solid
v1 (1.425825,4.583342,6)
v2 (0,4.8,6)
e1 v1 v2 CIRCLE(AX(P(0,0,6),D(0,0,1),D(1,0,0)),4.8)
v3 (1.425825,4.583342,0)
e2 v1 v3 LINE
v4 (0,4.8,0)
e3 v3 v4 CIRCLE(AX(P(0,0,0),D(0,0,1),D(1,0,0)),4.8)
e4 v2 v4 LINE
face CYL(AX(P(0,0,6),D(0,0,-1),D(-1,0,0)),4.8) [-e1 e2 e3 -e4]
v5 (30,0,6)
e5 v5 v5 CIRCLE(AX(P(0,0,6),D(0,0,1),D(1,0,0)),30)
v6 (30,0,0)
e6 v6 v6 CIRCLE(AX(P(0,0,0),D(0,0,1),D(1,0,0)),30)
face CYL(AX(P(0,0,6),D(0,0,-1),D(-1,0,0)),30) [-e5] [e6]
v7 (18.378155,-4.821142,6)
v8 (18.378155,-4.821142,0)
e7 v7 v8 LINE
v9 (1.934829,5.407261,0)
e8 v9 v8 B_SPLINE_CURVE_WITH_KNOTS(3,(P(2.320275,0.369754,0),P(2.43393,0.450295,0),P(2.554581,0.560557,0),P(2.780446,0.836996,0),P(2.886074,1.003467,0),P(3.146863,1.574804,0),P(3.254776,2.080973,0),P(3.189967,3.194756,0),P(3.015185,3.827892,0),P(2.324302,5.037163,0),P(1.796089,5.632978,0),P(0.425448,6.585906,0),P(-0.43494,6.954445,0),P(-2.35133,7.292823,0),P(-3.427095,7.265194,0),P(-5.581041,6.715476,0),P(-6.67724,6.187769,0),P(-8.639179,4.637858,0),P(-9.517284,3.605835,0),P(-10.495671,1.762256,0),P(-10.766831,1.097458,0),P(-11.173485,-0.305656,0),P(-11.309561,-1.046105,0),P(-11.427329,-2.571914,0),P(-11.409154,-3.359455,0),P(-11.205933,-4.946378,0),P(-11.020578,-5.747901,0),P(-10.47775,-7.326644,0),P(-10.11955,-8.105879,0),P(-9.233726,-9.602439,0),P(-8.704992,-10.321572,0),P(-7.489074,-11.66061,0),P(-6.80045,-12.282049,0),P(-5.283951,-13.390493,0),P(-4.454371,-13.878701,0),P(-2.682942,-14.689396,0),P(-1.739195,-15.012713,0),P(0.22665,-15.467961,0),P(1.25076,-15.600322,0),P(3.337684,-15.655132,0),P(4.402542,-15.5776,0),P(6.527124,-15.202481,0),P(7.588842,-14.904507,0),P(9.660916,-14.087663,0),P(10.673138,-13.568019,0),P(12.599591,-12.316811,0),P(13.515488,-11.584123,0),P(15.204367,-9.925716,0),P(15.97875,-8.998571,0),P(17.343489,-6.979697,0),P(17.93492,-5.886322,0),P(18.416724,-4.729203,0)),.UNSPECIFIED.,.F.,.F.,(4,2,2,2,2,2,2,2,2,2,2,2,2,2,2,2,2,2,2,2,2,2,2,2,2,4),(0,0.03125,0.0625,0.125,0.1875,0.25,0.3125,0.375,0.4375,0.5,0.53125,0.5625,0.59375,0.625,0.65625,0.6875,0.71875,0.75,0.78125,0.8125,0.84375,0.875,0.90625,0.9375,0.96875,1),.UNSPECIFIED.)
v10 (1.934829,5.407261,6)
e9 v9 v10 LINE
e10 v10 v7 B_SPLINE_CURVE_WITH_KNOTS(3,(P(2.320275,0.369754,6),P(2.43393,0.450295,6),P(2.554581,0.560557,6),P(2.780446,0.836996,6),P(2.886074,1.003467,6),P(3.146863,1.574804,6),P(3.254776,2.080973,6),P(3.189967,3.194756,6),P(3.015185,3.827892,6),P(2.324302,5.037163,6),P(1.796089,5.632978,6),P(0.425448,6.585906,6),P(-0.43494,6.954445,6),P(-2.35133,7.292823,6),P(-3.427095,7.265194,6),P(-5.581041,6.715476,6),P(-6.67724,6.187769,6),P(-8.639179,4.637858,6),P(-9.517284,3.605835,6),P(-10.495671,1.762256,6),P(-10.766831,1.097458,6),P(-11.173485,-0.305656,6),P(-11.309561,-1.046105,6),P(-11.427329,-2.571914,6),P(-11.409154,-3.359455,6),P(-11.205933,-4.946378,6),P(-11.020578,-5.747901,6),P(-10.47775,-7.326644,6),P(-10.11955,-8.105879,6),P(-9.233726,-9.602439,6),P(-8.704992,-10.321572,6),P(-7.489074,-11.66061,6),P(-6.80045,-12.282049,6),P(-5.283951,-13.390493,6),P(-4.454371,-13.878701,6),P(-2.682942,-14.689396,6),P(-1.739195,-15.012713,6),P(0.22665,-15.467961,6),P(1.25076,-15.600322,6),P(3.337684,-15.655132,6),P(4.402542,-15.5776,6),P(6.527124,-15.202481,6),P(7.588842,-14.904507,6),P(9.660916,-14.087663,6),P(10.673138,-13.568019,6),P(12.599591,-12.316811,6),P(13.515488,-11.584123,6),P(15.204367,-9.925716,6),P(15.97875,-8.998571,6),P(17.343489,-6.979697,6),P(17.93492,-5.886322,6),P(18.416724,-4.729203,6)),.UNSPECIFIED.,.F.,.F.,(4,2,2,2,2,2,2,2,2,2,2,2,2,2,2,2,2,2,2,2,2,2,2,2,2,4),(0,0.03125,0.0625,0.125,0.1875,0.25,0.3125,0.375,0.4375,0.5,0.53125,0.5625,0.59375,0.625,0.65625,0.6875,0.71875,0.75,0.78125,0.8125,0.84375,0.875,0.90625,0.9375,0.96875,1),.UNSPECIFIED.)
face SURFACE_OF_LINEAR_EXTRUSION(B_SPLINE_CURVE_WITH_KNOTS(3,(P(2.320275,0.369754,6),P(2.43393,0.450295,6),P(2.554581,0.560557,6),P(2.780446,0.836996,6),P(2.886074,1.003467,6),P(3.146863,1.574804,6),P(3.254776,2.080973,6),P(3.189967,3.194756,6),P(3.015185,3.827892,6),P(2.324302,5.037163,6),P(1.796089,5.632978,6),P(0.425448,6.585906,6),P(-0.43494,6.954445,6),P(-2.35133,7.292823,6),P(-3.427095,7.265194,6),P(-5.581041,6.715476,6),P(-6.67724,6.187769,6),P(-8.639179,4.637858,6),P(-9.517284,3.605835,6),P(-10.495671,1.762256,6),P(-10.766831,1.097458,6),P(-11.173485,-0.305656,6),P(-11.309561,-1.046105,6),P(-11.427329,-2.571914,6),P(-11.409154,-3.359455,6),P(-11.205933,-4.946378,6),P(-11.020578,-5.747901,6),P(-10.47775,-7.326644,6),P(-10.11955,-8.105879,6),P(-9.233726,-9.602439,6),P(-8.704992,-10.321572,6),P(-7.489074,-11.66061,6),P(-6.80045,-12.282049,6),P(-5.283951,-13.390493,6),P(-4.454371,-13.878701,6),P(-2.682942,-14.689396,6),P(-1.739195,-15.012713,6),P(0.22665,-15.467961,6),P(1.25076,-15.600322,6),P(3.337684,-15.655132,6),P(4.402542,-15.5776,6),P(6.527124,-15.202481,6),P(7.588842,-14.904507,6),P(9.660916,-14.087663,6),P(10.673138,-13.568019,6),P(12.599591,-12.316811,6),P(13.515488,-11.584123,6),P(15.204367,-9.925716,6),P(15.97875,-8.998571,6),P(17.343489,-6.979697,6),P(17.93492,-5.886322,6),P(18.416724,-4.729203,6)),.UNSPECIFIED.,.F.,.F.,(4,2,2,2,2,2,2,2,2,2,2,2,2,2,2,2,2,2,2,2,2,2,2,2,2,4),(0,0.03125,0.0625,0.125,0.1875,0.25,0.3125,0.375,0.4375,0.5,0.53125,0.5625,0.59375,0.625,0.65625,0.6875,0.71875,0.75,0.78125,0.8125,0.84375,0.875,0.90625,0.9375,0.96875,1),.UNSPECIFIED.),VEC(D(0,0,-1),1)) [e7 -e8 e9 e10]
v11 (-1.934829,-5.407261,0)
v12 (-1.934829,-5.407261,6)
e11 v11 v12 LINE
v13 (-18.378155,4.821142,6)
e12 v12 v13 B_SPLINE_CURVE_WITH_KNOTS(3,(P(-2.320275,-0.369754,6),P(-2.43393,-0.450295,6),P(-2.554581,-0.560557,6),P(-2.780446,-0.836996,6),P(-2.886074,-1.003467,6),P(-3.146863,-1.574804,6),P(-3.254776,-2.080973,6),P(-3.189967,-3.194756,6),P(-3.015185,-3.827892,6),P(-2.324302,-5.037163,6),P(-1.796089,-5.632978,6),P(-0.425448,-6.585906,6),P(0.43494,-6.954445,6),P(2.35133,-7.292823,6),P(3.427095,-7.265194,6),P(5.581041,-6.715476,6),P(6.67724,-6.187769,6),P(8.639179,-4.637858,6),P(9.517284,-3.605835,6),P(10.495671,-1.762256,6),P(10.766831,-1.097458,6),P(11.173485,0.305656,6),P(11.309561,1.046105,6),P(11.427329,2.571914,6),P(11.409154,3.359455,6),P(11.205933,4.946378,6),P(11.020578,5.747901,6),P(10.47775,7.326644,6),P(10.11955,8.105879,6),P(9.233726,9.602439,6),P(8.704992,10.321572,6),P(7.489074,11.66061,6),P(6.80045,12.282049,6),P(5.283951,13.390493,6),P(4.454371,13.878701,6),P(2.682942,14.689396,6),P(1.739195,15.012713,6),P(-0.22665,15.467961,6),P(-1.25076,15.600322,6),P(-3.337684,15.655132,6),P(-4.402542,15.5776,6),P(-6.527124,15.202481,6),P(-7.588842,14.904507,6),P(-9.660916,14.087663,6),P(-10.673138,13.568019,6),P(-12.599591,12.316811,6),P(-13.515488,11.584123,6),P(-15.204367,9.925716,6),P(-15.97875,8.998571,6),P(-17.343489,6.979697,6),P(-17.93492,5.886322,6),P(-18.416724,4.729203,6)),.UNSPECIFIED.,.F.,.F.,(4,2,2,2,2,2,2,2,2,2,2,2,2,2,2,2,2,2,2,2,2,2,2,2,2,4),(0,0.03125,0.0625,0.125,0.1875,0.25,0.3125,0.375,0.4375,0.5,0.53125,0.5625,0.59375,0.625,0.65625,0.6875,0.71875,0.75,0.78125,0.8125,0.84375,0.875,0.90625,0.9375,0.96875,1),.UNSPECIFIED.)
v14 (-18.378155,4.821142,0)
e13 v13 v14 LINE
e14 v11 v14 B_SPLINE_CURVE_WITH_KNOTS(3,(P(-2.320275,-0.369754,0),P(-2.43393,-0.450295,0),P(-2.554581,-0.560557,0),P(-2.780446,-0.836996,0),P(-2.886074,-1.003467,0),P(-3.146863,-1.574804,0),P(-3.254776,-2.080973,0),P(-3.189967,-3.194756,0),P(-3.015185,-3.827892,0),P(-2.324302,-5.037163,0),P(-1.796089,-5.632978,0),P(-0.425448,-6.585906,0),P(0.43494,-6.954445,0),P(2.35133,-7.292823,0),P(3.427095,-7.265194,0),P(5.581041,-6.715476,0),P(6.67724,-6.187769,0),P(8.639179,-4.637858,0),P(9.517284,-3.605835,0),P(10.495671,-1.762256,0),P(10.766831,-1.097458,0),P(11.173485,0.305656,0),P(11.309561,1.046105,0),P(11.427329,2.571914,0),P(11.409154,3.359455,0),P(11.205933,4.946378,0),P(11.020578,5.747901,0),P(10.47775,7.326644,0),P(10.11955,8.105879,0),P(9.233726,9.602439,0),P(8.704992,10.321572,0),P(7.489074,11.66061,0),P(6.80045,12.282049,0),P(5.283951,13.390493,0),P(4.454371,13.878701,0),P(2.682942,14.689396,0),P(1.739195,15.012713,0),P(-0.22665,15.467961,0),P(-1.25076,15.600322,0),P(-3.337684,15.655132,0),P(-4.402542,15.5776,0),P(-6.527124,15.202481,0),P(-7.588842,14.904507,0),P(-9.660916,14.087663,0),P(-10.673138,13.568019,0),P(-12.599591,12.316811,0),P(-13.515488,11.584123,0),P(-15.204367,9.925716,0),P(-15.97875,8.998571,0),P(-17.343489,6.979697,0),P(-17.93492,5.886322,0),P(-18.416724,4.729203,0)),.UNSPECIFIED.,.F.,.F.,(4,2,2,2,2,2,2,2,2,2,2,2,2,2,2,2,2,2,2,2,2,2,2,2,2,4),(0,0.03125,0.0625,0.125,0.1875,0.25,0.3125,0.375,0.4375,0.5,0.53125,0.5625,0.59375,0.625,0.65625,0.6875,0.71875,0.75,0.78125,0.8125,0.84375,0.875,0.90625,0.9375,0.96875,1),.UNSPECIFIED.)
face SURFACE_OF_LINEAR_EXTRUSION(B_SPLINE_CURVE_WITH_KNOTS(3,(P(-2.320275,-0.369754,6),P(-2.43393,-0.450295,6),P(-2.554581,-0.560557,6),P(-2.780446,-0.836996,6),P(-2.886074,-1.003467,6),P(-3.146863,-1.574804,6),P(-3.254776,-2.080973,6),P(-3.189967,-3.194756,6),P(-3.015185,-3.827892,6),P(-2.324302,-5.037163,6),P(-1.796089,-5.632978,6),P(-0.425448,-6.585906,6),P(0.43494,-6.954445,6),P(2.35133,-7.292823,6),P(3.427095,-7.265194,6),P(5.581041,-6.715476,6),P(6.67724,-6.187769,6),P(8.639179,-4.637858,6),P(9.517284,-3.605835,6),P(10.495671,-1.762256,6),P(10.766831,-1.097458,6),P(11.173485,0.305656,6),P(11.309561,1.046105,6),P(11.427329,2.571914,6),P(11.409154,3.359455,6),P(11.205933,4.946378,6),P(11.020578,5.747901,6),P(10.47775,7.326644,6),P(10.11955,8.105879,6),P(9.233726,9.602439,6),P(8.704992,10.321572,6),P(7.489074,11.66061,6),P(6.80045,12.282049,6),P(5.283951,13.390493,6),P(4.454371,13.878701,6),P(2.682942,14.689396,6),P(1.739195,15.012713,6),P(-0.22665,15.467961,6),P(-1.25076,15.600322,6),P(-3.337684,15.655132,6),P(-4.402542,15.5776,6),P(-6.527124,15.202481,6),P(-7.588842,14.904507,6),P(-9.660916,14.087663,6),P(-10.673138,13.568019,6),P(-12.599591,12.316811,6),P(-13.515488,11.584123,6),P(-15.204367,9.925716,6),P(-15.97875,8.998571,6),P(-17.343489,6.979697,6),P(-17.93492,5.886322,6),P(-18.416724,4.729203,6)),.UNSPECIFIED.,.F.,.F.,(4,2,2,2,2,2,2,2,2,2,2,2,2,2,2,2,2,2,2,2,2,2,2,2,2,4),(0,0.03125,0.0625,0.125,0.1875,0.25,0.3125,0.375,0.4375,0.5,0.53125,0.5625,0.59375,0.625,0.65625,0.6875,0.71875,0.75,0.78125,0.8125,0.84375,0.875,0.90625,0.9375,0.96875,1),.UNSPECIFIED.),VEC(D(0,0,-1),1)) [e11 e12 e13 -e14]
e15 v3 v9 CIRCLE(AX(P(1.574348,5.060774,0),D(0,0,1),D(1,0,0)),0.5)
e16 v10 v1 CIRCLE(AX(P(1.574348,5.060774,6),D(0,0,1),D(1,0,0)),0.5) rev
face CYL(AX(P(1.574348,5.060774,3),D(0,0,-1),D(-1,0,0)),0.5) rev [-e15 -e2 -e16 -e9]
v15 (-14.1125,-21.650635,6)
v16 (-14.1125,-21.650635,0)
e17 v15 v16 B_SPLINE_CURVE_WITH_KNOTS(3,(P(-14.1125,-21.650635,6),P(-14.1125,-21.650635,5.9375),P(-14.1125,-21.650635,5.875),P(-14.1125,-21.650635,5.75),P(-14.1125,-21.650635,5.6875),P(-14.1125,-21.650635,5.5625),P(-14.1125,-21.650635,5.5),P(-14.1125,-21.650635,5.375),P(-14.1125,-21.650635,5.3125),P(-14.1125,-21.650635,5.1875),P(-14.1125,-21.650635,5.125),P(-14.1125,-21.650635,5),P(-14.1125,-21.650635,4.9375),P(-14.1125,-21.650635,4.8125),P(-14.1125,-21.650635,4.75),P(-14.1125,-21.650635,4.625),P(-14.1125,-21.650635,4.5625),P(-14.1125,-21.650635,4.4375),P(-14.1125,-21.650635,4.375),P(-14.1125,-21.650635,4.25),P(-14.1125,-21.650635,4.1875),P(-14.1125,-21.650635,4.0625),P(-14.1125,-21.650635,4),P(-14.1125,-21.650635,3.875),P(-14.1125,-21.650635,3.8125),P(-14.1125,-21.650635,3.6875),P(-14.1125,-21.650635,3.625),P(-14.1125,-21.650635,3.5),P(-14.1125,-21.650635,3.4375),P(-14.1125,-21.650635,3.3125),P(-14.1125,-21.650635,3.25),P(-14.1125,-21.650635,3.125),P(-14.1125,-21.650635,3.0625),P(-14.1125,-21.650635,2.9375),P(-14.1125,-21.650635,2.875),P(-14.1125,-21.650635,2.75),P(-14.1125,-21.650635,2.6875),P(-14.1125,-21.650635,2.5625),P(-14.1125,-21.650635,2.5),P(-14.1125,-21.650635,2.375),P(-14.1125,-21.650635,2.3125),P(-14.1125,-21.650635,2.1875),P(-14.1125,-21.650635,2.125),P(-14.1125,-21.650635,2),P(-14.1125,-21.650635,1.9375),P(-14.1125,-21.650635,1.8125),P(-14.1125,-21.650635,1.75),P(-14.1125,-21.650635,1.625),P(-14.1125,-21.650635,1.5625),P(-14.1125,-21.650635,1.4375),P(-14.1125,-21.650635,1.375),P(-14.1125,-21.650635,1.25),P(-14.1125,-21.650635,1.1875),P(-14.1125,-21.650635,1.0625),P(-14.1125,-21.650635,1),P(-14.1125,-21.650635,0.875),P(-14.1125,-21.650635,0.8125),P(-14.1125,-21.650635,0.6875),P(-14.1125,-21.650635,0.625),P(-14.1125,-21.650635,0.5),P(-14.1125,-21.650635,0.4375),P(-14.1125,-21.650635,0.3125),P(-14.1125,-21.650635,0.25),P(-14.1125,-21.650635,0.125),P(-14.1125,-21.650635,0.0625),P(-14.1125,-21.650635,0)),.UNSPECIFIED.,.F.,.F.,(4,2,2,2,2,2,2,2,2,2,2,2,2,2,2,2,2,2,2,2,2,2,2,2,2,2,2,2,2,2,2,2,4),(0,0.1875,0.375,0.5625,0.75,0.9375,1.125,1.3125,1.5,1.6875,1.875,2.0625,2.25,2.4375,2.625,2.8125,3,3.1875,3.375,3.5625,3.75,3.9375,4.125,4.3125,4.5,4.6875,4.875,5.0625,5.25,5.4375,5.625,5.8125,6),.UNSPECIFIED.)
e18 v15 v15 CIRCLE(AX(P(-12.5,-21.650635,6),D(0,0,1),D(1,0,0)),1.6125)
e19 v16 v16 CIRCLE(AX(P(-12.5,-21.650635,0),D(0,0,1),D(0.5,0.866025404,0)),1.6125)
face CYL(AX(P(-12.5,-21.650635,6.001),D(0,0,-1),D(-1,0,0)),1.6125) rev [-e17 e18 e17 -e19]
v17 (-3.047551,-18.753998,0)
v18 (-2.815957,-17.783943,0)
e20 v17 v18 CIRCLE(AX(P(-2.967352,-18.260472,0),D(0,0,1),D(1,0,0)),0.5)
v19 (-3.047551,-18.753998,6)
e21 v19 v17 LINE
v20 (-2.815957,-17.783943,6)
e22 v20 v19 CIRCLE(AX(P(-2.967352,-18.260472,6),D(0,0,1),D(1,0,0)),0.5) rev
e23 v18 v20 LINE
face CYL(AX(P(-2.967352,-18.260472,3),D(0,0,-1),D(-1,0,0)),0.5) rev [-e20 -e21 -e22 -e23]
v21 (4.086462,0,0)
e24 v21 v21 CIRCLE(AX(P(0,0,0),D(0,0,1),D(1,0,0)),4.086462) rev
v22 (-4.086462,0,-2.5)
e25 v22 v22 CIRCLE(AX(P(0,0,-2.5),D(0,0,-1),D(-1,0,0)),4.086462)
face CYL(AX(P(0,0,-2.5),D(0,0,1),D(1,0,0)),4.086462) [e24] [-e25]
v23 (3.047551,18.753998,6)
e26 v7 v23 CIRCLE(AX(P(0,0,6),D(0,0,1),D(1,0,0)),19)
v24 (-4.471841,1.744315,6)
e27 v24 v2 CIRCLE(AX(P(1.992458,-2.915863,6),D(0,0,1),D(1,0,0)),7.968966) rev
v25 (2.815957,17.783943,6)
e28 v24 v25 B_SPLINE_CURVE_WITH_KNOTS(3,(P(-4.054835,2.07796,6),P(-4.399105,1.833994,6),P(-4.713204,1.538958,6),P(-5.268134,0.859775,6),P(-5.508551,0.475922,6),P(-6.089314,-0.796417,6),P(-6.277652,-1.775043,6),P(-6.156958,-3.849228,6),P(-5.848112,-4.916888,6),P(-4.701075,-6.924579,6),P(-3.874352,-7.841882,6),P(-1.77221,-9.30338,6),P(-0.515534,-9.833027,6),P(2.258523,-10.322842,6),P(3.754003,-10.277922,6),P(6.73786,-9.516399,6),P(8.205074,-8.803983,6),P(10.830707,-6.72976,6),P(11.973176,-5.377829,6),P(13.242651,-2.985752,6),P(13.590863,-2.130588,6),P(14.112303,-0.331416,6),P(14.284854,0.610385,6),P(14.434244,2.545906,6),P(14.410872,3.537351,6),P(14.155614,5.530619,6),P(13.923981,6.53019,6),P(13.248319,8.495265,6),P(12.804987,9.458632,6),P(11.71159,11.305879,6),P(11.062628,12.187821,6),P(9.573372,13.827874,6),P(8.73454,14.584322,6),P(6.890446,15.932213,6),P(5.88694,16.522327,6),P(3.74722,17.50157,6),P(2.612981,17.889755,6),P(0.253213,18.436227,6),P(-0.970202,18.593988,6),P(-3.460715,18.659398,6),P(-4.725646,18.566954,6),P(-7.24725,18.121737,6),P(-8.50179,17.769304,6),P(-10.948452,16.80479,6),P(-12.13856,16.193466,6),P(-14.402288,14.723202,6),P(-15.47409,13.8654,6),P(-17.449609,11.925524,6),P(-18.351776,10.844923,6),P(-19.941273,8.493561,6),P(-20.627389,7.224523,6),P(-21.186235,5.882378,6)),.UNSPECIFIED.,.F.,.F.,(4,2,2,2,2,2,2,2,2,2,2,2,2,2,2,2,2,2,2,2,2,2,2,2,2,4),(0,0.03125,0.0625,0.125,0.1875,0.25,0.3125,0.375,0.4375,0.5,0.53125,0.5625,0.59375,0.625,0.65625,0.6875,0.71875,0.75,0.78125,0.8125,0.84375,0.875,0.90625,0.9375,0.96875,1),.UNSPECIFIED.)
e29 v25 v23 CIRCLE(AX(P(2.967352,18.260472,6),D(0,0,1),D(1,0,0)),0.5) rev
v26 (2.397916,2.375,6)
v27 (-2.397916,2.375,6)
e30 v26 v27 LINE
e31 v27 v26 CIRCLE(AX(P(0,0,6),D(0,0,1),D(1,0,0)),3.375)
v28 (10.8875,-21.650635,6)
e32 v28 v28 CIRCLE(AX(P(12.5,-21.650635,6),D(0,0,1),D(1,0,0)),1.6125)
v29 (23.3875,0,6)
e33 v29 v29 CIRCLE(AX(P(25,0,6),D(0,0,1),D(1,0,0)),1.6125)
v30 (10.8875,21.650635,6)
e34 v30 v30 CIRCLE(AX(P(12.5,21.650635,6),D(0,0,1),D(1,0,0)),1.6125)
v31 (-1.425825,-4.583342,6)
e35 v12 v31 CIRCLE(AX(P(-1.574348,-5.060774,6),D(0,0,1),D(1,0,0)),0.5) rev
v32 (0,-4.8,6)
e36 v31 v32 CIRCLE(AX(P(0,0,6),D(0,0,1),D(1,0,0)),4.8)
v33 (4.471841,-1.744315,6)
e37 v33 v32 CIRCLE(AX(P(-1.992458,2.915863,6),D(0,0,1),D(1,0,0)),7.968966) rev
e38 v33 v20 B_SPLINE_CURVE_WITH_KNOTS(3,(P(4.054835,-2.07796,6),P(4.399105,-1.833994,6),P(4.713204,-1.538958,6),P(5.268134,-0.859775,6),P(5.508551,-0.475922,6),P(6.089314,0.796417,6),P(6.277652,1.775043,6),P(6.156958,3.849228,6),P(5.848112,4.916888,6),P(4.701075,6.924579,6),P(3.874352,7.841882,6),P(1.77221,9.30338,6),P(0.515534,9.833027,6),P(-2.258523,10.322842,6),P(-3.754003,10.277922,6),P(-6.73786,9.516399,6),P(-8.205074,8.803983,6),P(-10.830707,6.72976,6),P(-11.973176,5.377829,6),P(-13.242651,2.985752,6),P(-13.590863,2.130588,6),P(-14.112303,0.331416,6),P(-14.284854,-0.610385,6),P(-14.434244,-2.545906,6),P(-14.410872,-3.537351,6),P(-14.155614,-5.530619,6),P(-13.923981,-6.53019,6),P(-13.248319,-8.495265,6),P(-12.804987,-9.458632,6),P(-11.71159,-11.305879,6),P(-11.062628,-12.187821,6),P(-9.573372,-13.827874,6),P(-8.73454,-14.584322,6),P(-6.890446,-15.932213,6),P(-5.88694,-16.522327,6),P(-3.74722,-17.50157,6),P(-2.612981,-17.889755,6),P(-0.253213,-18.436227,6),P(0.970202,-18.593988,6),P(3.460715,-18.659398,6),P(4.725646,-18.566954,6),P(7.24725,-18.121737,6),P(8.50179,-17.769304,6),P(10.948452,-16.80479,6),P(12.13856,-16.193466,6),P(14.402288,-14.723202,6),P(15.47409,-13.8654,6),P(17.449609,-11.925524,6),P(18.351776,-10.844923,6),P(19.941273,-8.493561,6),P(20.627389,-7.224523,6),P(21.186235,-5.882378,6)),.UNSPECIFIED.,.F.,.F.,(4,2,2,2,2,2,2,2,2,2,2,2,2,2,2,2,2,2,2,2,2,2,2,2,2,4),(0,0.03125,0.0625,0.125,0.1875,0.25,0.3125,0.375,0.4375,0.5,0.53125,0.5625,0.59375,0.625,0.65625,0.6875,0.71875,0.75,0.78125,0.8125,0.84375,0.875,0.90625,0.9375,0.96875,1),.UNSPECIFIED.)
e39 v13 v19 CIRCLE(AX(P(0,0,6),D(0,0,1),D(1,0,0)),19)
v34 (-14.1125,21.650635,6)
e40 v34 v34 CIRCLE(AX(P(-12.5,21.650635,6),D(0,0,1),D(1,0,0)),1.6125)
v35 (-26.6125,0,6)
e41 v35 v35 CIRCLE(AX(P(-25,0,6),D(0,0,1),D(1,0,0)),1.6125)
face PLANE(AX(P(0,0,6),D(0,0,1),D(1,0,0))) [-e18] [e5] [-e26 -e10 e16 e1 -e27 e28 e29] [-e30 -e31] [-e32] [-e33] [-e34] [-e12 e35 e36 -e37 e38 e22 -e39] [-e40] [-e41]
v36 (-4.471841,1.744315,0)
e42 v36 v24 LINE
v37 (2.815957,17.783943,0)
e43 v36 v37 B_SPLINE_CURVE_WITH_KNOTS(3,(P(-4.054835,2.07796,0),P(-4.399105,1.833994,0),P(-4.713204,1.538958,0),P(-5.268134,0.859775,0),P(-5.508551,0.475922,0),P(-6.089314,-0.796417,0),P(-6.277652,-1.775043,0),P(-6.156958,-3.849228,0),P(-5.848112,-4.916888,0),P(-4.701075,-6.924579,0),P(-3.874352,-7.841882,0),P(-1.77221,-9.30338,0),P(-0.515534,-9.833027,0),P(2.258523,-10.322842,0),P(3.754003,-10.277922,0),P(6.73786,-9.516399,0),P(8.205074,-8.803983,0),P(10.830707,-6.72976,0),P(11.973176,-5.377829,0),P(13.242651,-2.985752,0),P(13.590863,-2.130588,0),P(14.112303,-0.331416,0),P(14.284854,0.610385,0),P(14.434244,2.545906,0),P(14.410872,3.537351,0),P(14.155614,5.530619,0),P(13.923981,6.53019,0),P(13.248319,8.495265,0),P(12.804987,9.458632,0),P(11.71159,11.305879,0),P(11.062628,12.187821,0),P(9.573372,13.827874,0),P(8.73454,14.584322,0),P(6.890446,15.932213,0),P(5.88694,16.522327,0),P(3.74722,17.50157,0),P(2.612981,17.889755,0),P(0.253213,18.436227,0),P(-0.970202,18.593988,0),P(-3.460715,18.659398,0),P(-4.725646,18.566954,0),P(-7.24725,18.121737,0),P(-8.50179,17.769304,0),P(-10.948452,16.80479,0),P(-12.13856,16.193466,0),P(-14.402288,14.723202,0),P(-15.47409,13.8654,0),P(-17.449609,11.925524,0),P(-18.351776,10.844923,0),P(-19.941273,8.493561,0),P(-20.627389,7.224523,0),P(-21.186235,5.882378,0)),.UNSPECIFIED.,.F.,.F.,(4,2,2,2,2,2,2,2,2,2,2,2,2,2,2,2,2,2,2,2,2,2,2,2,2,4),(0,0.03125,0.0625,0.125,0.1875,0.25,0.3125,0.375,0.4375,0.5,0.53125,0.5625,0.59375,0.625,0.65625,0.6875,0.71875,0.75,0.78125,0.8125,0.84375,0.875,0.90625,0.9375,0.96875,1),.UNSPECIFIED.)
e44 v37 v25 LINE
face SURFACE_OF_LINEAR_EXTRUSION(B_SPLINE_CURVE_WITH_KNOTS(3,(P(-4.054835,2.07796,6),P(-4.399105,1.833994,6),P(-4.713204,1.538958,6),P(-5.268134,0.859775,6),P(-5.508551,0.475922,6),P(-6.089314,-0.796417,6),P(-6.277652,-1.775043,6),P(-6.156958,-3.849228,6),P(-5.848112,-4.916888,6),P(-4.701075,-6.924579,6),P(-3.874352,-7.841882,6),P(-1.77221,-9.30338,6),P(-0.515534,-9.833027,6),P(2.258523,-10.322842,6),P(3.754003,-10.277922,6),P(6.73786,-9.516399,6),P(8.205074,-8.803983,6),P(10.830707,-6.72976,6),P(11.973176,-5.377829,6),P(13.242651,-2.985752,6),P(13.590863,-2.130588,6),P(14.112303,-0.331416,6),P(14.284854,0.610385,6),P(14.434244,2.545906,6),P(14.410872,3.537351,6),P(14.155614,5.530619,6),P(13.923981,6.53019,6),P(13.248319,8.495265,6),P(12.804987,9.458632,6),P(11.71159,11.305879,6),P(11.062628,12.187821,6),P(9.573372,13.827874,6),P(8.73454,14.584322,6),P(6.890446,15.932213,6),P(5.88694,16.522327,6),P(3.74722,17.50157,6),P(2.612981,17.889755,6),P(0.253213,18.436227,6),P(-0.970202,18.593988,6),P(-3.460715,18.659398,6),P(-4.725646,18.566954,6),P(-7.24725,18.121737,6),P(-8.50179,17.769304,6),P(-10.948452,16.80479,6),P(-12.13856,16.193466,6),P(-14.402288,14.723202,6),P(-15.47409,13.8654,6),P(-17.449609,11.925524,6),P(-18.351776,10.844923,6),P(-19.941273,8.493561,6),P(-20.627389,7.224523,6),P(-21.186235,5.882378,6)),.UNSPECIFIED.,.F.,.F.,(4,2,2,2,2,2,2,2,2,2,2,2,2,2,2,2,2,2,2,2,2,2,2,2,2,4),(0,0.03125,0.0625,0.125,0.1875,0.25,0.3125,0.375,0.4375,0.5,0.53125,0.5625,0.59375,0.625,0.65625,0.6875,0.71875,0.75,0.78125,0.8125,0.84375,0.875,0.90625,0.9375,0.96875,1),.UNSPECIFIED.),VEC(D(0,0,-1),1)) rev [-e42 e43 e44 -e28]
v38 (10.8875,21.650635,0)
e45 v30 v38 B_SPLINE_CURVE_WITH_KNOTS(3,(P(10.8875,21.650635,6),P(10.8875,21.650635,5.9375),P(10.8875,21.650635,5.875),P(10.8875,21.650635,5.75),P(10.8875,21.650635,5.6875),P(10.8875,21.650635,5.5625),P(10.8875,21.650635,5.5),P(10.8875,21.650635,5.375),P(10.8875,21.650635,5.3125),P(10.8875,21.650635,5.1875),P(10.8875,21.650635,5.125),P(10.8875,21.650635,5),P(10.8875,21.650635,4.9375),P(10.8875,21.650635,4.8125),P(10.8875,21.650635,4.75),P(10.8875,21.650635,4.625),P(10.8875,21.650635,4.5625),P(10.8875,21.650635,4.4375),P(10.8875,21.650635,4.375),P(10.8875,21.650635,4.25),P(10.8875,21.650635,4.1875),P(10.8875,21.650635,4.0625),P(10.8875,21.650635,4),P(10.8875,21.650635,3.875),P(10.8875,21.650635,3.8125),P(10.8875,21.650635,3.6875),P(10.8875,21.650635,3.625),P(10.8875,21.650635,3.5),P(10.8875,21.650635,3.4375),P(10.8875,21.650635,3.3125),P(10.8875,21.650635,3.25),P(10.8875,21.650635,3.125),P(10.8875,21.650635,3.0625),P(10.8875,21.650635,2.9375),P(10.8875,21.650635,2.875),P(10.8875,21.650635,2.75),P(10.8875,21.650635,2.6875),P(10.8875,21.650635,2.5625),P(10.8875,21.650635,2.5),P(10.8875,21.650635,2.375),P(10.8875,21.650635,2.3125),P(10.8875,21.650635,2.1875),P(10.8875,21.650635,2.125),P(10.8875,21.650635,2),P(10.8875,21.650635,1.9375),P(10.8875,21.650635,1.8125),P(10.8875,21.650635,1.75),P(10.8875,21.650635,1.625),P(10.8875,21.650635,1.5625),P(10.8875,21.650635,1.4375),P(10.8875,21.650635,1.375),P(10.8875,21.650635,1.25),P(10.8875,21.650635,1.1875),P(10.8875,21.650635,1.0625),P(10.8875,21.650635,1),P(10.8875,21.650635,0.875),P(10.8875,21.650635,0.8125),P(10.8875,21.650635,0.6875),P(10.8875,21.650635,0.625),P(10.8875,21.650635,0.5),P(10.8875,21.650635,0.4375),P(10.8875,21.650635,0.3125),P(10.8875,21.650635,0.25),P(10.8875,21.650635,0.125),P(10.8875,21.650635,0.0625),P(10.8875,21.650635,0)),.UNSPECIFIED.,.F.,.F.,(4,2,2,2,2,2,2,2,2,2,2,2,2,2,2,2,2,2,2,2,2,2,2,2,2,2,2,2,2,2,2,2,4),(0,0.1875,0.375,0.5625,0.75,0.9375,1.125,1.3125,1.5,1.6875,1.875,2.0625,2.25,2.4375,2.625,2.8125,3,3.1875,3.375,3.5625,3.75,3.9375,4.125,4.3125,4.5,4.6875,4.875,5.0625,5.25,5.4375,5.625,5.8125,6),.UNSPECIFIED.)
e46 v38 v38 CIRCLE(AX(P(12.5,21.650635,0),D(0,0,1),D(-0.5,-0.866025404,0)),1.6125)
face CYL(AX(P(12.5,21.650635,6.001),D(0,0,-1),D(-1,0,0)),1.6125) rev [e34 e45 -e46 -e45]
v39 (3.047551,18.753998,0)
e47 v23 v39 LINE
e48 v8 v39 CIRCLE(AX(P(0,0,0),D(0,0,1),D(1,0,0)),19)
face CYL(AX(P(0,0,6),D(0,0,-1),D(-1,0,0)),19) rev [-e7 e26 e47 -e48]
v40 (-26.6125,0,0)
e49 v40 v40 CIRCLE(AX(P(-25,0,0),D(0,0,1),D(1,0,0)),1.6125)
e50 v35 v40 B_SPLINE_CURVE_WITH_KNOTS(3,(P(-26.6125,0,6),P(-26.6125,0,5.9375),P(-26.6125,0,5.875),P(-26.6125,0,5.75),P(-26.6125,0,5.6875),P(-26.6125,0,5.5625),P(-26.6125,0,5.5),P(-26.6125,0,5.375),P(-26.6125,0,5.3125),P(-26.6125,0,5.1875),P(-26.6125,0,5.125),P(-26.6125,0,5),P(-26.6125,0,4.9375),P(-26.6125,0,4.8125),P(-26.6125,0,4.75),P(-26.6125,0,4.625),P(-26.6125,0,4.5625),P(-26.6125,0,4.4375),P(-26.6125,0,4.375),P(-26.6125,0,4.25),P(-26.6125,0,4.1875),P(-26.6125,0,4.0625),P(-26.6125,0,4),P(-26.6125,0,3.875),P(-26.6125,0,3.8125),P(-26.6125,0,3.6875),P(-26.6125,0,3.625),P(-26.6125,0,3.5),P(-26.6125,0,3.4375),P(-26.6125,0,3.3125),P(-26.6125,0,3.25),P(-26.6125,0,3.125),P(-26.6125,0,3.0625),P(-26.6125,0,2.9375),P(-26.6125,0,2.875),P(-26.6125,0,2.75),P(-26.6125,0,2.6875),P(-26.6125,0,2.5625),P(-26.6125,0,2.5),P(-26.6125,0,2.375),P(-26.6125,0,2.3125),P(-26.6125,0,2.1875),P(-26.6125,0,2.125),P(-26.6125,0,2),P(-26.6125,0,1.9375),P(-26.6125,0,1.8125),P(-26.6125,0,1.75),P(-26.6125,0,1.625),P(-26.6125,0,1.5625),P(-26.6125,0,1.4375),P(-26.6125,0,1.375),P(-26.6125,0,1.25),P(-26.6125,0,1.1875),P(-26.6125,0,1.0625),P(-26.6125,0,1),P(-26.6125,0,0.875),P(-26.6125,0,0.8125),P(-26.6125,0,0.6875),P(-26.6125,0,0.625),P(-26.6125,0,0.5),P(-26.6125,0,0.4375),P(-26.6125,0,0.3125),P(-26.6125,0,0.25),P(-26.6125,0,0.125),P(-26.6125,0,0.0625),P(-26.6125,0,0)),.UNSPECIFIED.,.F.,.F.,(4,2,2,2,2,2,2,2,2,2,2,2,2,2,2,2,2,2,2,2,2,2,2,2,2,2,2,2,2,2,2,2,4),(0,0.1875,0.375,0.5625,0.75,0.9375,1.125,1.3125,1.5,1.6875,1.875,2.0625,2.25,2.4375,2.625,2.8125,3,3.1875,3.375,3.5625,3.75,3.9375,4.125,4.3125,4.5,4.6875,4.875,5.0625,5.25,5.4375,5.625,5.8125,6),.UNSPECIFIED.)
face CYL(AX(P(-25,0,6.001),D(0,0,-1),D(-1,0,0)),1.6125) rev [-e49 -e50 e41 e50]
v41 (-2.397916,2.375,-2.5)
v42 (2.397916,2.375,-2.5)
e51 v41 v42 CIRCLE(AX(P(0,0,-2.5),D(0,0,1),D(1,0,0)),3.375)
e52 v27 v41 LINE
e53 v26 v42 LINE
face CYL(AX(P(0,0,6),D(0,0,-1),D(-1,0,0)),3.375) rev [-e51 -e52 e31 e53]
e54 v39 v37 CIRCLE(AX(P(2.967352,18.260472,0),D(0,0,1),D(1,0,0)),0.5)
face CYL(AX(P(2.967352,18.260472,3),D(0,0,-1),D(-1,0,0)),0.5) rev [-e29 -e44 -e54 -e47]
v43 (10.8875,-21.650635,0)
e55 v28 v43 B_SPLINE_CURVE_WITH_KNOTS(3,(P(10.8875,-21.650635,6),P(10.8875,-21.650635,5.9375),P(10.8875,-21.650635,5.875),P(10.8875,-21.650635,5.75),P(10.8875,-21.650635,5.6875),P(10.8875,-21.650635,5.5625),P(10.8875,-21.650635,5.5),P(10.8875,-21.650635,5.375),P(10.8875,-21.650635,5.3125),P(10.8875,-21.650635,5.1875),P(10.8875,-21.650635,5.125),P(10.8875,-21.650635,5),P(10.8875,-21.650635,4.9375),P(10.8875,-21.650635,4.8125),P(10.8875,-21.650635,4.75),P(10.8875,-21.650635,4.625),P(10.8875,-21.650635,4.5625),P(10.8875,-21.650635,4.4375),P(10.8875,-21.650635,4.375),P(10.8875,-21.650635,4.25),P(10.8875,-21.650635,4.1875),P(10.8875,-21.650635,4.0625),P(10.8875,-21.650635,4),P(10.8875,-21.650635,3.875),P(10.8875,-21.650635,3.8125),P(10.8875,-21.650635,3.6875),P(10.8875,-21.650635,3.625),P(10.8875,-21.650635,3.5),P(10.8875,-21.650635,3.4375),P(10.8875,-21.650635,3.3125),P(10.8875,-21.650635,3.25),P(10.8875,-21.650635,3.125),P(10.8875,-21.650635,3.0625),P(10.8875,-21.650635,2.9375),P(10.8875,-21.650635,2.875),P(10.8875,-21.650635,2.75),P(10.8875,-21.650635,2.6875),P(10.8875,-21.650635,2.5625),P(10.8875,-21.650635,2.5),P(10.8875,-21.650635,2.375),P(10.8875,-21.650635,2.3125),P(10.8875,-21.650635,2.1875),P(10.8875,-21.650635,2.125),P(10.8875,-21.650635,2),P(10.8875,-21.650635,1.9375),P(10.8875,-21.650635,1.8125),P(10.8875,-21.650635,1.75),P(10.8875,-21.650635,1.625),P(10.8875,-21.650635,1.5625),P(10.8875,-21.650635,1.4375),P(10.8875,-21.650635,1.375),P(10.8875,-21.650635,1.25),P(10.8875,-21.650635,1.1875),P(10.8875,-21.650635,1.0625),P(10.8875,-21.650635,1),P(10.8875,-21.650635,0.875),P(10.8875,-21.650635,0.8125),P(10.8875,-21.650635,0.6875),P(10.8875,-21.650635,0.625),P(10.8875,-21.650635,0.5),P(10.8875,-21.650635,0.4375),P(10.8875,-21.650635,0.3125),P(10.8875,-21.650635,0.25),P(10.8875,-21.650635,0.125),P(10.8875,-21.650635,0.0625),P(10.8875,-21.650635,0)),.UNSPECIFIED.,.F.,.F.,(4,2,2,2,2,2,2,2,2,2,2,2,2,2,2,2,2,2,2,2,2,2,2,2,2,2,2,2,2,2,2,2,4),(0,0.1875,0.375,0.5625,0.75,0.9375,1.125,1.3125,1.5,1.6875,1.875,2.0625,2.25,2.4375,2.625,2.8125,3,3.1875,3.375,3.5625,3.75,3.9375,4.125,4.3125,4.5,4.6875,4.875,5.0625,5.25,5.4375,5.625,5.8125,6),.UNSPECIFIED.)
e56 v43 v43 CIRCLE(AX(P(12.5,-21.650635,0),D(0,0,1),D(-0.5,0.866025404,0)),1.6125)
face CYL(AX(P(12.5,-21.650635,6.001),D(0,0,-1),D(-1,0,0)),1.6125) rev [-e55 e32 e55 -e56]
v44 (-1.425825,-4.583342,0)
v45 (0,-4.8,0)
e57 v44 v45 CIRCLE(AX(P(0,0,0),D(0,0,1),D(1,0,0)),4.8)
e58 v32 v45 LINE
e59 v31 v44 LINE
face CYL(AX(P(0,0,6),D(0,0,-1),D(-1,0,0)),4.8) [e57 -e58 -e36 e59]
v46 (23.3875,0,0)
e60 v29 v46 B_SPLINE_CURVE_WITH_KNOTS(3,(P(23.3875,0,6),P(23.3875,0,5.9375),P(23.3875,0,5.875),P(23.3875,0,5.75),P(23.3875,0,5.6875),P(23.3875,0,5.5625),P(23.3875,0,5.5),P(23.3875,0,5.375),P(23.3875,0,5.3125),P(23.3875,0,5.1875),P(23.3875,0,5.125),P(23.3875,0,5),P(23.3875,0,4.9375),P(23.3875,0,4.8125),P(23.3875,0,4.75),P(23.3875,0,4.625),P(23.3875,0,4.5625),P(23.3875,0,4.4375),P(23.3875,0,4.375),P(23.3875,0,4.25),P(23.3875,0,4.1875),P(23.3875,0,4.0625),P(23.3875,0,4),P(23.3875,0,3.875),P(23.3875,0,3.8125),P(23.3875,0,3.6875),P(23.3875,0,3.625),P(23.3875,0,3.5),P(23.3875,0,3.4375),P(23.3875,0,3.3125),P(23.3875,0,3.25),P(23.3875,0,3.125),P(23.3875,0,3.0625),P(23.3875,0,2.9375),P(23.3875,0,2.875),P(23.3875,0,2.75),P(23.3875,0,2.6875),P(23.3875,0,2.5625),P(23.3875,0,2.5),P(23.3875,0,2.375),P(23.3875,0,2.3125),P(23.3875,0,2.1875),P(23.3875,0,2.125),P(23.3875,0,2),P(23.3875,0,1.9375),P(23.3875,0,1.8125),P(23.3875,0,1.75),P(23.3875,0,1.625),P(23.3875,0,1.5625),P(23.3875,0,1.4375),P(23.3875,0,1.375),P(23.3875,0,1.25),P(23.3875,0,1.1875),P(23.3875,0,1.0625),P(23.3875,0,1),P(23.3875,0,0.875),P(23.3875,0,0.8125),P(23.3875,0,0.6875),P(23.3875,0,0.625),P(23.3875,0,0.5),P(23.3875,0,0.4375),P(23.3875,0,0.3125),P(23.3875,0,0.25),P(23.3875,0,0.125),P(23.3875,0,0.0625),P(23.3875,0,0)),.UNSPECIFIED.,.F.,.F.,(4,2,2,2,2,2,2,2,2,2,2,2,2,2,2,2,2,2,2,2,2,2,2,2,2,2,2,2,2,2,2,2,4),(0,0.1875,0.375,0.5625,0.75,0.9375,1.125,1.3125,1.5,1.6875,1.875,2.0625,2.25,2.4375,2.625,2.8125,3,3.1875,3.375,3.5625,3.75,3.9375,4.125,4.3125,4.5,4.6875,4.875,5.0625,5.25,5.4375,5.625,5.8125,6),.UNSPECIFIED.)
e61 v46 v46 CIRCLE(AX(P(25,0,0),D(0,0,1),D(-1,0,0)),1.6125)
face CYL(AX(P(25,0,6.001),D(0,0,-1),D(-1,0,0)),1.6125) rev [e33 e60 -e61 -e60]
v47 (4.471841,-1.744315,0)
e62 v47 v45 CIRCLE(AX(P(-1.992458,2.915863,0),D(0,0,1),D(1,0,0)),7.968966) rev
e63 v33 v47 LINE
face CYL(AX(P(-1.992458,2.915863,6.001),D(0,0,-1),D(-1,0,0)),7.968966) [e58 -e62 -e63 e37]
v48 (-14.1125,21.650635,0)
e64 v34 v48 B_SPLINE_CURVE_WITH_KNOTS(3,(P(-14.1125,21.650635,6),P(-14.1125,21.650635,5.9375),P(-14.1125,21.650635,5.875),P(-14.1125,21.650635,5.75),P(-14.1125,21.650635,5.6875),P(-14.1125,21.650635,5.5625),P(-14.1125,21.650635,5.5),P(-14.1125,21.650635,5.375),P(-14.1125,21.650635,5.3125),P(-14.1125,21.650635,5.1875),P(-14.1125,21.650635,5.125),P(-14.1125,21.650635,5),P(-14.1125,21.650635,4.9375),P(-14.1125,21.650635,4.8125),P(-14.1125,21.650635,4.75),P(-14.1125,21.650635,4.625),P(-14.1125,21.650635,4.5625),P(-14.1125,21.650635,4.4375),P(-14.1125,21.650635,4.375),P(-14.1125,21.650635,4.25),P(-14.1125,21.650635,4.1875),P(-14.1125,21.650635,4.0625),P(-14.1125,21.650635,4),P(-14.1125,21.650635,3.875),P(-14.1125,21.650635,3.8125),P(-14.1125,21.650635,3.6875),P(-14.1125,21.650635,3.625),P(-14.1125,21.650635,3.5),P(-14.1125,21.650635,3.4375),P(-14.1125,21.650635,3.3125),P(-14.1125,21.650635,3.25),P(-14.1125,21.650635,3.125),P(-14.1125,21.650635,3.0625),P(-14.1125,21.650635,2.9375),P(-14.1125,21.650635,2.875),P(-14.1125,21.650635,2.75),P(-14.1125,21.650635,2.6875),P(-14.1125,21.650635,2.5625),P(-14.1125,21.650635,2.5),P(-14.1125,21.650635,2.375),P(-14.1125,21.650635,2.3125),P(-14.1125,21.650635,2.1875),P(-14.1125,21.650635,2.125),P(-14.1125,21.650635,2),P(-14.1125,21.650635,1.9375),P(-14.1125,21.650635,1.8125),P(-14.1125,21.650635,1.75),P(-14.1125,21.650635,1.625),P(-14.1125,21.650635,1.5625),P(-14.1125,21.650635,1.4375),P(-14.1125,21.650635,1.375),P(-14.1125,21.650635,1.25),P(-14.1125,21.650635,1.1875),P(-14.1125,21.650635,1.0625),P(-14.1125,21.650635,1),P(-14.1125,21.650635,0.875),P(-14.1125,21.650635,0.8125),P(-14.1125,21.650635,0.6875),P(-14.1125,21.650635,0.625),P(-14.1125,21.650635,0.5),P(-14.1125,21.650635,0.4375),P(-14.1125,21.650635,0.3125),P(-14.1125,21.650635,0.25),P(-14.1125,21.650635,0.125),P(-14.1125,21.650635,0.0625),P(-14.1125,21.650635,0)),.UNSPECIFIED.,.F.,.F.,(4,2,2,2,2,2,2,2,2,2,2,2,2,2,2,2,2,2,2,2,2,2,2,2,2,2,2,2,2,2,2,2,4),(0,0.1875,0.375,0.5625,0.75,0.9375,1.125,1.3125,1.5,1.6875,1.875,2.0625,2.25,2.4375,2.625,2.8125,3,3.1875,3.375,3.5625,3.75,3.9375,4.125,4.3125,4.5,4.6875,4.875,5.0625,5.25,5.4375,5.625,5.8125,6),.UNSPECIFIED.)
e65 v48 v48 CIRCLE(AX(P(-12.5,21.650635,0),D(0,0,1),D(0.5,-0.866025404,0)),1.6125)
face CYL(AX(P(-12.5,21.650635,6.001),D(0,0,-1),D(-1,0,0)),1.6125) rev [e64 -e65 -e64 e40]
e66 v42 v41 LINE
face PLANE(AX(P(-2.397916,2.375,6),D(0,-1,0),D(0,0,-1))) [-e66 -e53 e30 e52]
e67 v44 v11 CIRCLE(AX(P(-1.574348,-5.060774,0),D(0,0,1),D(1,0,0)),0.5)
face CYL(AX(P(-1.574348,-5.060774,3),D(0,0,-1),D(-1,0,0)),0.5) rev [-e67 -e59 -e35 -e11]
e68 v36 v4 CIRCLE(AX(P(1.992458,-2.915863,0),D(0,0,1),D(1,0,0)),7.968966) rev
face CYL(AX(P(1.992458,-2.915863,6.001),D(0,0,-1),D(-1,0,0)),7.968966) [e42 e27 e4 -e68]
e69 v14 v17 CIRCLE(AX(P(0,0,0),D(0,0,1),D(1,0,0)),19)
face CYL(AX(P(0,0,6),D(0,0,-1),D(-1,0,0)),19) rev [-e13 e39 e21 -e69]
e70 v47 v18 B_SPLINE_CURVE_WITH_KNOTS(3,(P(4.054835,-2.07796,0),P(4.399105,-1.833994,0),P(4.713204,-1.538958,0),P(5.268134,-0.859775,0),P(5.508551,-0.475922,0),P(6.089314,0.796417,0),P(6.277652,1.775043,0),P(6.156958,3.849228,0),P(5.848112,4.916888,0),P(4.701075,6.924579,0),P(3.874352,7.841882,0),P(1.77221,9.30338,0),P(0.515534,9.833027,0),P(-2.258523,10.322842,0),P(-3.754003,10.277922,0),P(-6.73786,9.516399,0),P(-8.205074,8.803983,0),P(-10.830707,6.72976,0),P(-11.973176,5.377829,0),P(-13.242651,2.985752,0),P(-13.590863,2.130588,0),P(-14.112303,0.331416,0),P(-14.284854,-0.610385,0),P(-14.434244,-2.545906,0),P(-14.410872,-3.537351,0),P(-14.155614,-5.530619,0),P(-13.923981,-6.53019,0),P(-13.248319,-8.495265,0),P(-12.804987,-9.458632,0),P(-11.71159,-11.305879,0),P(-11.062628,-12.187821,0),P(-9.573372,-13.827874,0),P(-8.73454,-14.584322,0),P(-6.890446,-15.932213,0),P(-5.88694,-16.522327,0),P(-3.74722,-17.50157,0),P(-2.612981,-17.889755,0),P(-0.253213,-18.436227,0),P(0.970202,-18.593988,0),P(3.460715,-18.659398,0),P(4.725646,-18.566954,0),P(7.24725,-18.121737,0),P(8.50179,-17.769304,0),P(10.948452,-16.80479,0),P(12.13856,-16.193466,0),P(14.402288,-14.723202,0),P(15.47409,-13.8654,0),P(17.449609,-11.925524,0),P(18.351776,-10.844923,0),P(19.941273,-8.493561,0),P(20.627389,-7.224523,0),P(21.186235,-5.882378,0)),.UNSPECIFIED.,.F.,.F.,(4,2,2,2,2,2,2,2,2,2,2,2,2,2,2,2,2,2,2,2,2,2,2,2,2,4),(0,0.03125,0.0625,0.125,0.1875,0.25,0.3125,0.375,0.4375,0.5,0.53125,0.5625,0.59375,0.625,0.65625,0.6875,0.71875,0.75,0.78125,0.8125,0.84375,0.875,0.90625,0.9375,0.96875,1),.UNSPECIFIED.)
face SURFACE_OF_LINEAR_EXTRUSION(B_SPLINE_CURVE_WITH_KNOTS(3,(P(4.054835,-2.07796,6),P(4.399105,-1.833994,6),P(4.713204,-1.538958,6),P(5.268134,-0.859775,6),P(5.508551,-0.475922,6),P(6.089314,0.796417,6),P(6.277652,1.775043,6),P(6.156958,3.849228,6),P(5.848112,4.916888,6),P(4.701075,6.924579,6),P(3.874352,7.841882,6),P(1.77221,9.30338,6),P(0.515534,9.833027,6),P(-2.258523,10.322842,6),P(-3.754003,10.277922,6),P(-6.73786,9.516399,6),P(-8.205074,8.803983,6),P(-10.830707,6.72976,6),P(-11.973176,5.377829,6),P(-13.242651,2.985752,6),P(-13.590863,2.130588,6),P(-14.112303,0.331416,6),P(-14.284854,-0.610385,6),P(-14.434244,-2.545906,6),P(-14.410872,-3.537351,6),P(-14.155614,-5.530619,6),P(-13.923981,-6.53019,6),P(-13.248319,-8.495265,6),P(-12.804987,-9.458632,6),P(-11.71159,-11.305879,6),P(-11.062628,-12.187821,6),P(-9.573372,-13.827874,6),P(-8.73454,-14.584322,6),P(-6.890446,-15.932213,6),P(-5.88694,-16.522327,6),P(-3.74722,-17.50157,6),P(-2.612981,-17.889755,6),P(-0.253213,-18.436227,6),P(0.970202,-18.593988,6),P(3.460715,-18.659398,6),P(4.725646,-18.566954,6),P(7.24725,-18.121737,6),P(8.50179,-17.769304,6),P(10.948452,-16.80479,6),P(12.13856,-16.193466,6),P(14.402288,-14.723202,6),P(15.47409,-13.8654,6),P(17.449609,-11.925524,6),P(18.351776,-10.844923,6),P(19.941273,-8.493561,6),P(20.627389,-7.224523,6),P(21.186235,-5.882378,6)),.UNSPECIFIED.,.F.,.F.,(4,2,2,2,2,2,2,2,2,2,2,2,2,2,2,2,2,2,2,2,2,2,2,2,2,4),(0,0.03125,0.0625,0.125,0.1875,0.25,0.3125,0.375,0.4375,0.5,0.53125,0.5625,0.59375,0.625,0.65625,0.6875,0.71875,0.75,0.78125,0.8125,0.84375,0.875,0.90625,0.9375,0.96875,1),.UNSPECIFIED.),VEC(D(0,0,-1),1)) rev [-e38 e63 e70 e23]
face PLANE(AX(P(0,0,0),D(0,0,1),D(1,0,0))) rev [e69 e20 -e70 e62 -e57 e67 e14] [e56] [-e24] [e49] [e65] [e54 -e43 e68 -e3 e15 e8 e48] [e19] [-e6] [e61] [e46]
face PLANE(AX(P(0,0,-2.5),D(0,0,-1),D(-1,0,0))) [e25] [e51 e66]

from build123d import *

# Parameters (mm, degrees)
SKETCH1_R               = 30
SKETCH1_R_2             = 19
BOSS_EXTRUDE1_DEPTH     = 6
SKETCH1_R_3             = 4.8
BOSS_EXTRUDE1_2_DEPTH   = 6
EXTRUDE_THIN1_DEPTH     = 6
CIRPATTERN1_COUNT       = 2
SKETCH9_R               = 4.086461839
BOSS_EXTRUDE3_DEPTH     = 2.5
CUT_EXTRUDE2_REACH      = 44.849
SKETCH4_R               = 1.6125
CIRPATTERN2_COUNT       = 6
CUT_EXTRUDE3_DEPTH      = 43.848570725
CUT_EXTRUDE3_DEPTH_BACK = 43.848570725
CUT_EXTRUDE4_REACH      = 44.849
FILLET3_R               = 0.5


# Read off the part's stored shape, not the designer's step: Extrude-Thin1
with BuildPart() as part:
    # Sketch1 → Boss-Extrude1 (new body)
    with BuildSketch(Plane.XY):
        Circle(SKETCH1_R)
        Circle(SKETCH1_R_2, mode=Mode.SUBTRACT)
    extrude(amount=BOSS_EXTRUDE1_DEPTH)



with BuildPart() as body_2:
    # Sketch1 → Boss-Extrude1 2 (new body)
    with BuildSketch(Plane.XY):
        Circle(SKETCH1_R_3)
    extrude(amount=BOSS_EXTRUDE1_2_DEPTH)


with BuildPart() as part_1:
    add(part.part)

    add(body_2.part)  # Extrude-Thin1 merges body 2
    # Extrude-Thin1 outline → Extrude-Thin1 (add)
    with BuildSketch(Plane.XY):
        with BuildLine():
            ThreePointArc((-2.982283939, -3.76111453), (-4.633404211, -1.253620924), (-4.471841365, 1.744314996))
            add(Edge.make_bspline(
                [(-4.471841365, 1.744314996), (-4.656280132, 1.578520884), (-4.829643815, 1.39644694), (-5.268134024, 0.859774522), (-5.508550979, 0.475921884), (-6.089314004, -0.796416981), (-6.277652461, -1.775043044), (-6.156958422, -3.849228134), (-5.848111539, -4.916888286), (-4.701074788, -6.924579158), (-3.874352285, -7.841881846), (-1.772209934, -9.303379732), (-0.515534208, -9.833026737), (2.2585228, -10.322842004), (3.754003283, -10.277922339), (6.737860458, -9.516399172), (8.205073527, -8.803982666), (10.830706996, -6.729759977), (11.973176133, -5.377828677), (13.242651036, -2.985752228), (13.590862634, -2.130587863), (14.11230257, -0.33141552), (14.284853693, 0.610384541), (14.434244224, 2.54590596), (14.410872075, 3.537351035), (14.155614086, 5.530618766), (13.92398055, 6.530190205), (13.24831887, 8.495265), (12.804987465, 9.458632364), (11.711589511, 11.305878718), (11.062628134, 12.187820678), (9.57337189, 13.827874293), (8.734539676, 14.584322286), (6.890445718, 15.932212548), (5.886940321, 16.522327046), (3.747220053, 17.501569877), (2.612981166, 17.889754848), (0.253213214, 18.436226952), (-0.970201662, 18.593988054), (-2.775234189, 18.641394623), (-3.338985958, 18.630807023), (-3.904551177, 18.594474451)],
                knots=[0.013114223, 0.013114223, 0.013114223, 0.013114223, 0.03125, 0.03125, 0.0625, 0.0625, 0.125, 0.125, 0.1875, 0.1875, 0.25, 0.25, 0.3125, 0.3125, 0.375, 0.375, 0.4375, 0.4375, 0.5, 0.5, 0.53125, 0.53125, 0.5625, 0.5625, 0.59375, 0.59375, 0.625, 0.625, 0.65625, 0.65625, 0.6875, 0.6875, 0.71875, 0.71875, 0.75, 0.75, 0.78125, 0.78125, 0.8125, 0.8125, 0.826547707, 0.826547707, 0.826547707, 0.826547707], degree=3))
            ThreePointArc((-3.904551177, 18.594474451), (-13.097935775, 13.763868585), (-18.378155197, 4.821142141))
            add(Edge.make_bspline(
                [(-2.982283939, -3.76111453), (-2.900117375, -3.985308214), (-2.796401924, -4.21083352), (-2.324302177, -5.037163062), (-1.796089022, -5.632977998), (-0.42544773, -6.585905543), (0.434939841, -6.954445423), (2.351330437, -7.292822525), (3.427095408, -7.265193511), (5.581040851, -6.715475726), (6.677239672, -6.187769457), (8.63917944, -4.637857777), (9.517283547, -3.605835215), (10.495671123, -1.762255736), (10.766831426, -1.097457986), (11.173484801, 0.30565569), (11.309561474, 1.046104982), (11.427328915, 2.571913894), (11.409154422, 3.359454964), (11.205932916, 4.946378335), (11.020577877, 5.747900562), (10.477750396, 7.326644233), (10.119550016, 8.105878633), (9.233725774, 9.602438596), (8.704992436, 10.321571812), (7.489073995, 11.660610304), (6.800450018, 12.282049392), (5.283951031, 13.39049303), (4.454371448, 13.878701098), (2.6829423, 14.689395523), (1.739195133, 15.012712578), (-0.226650012, 15.467960532), (-1.25075985, 15.600322026), (-3.337683593, 15.655132061), (-4.402541801, 15.577599807), (-6.527123675, 15.202481181), (-7.588842349, 14.904507495), (-9.660915862, 14.087662981), (-10.673137841, 13.568018908), (-12.599590732, 12.316810654), (-13.515488441, 11.58412259), (-15.204366904, 9.925715954), (-15.9787504, 8.998571318), (-17.325389887, 7.006470862), (-17.903482072, 5.944264002), (-18.378155197, 4.821142141)],
                knots=[0.164583944, 0.164583944, 0.164583944, 0.164583944, 0.1875, 0.1875, 0.25, 0.25, 0.3125, 0.3125, 0.375, 0.375, 0.4375, 0.4375, 0.5, 0.5, 0.53125, 0.53125, 0.5625, 0.5625, 0.59375, 0.59375, 0.625, 0.625, 0.65625, 0.65625, 0.6875, 0.6875, 0.71875, 0.71875, 0.75, 0.75, 0.78125, 0.78125, 0.8125, 0.8125, 0.84375, 0.84375, 0.875, 0.875, 0.90625, 0.90625, 0.9375, 0.9375, 0.96875, 0.96875, 0.999171124, 0.999171124, 0.999171124, 0.999171124], degree=3))
        make_face()
    extrude_thin1 = extrude(amount=EXTRUDE_THIN1_DEPTH)

    # CirPattern1: Extrude-Thin1 ×2 about axis
    cirpattern1_axis = Axis((0, 0, 6), (0, 0, -1))
    for i in range(1, CIRPATTERN1_COUNT):
        add(extrude_thin1.rotate(cirpattern1_axis, i * 360 / CIRPATTERN1_COUNT))

    # Sketch9 → Boss-Extrude3 (add)
    with BuildSketch(Plane(origin=(0, 0, 0), x_dir=(-1, 0, 0), z_dir=(0, 0, -1))):
        with Locations(Location((0, 0, 0), (0, 0, 180))):
            Circle(SKETCH9_R)
    extrude(amount=BOSS_EXTRUDE3_DEPTH)

    # Sketch4 → Cut-Extrude2 (cut, up to next)
    with BuildSketch(Plane.XY, mode=Mode.PRIVATE) as cut_extrude2_sk1:
        with Locations(Location((-25, 0, 0), (0, 0, 180))):
            Circle(SKETCH4_R)
    cut_extrude2_tool1 = extrude(cut_extrude2_sk1.sketch, amount=CUT_EXTRUDE2_REACH, mode=Mode.PRIVATE) & part_1.part
    cut_extrude2 = cut_extrude2_tool1.solids().sort_by_distance((-25, 0, 0))[0]
    add(cut_extrude2, mode=Mode.SUBTRACT)

    # CirPattern2: Cut-Extrude2 ×6 about axis
    cirpattern2_axis = Axis((0, 0, 0), (0, 0, 1))
    for i in range(1, CIRPATTERN2_COUNT):
        add(cut_extrude2.rotate(cirpattern2_axis, i * 360 / CIRPATTERN2_COUNT), mode=Mode.SUBTRACT)

    # Sketch6 → Cut-Extrude3 (cut, two sides: drawn at the far end of the back side and taken through both)
    with BuildSketch(Plane.XY.offset(-CUT_EXTRUDE3_DEPTH_BACK)):
        with BuildLine():
            Line((-2.397915762, 2.375), (2.397915762, 2.375))
            ThreePointArc((2.397915762, 2.375), (0, -3.375), (-2.397915762, 2.375))
        make_face()
    extrude(amount=CUT_EXTRUDE3_DEPTH + CUT_EXTRUDE3_DEPTH_BACK, mode=Mode.SUBTRACT)

    # Sketch7 → Cut-Extrude4 (cut, up to next)
    with BuildSketch(Plane.XY, mode=Mode.PRIVATE) as cut_extrude4_sk1:
        with BuildLine():
            ThreePointArc((-4.471841365, 1.744314996), (-2.708070163, 3.963124524), (0, 4.8))
            ThreePointArc((0, 4.8), (-2.503483375, 3.663722045), (-4.471841365, 1.744314996))
        make_face()
    cut_extrude4_tool1 = extrude(cut_extrude4_sk1.sketch, amount=CUT_EXTRUDE4_REACH, mode=Mode.PRIVATE) & part_1.part
    # Sketch7 → Cut-Extrude4 (cut, up to next)
    with BuildSketch(Plane.XY, mode=Mode.PRIVATE) as cut_extrude4_sk2:
        with BuildLine():
            ThreePointArc((4.471841365, -1.744314996), (2.708070163, -3.963124524), (0, -4.8))
            ThreePointArc((0, -4.8), (2.503483375, -3.663722045), (4.471841365, -1.744314996))
        make_face()
    cut_extrude4_tool2 = extrude(cut_extrude4_sk2.sketch, amount=CUT_EXTRUDE4_REACH, mode=Mode.PRIVATE) & part_1.part
    add(cut_extrude4_tool1.solids().sort_by_distance((-2.531789, 3.705146, 0))[0], mode=Mode.SUBTRACT)
    add(cut_extrude4_tool2.solids().sort_by_distance((2.531789, -3.705146, 0))[0], mode=Mode.SUBTRACT)

    # Fillet3
    fillet3_edges = [part_1.edges().sort_by_distance(p)[0] for p in [
        (-3.904551177, 18.594474451, 3),
        (-2.982283939, -3.76111453, 3),
        (2.982283939, 3.76111453, 3),
        (3.904551177, -18.594474451, 3),
    ]]
    fillet(fillet3_edges, radius=FILLET3_R)


solid = part_1.part
